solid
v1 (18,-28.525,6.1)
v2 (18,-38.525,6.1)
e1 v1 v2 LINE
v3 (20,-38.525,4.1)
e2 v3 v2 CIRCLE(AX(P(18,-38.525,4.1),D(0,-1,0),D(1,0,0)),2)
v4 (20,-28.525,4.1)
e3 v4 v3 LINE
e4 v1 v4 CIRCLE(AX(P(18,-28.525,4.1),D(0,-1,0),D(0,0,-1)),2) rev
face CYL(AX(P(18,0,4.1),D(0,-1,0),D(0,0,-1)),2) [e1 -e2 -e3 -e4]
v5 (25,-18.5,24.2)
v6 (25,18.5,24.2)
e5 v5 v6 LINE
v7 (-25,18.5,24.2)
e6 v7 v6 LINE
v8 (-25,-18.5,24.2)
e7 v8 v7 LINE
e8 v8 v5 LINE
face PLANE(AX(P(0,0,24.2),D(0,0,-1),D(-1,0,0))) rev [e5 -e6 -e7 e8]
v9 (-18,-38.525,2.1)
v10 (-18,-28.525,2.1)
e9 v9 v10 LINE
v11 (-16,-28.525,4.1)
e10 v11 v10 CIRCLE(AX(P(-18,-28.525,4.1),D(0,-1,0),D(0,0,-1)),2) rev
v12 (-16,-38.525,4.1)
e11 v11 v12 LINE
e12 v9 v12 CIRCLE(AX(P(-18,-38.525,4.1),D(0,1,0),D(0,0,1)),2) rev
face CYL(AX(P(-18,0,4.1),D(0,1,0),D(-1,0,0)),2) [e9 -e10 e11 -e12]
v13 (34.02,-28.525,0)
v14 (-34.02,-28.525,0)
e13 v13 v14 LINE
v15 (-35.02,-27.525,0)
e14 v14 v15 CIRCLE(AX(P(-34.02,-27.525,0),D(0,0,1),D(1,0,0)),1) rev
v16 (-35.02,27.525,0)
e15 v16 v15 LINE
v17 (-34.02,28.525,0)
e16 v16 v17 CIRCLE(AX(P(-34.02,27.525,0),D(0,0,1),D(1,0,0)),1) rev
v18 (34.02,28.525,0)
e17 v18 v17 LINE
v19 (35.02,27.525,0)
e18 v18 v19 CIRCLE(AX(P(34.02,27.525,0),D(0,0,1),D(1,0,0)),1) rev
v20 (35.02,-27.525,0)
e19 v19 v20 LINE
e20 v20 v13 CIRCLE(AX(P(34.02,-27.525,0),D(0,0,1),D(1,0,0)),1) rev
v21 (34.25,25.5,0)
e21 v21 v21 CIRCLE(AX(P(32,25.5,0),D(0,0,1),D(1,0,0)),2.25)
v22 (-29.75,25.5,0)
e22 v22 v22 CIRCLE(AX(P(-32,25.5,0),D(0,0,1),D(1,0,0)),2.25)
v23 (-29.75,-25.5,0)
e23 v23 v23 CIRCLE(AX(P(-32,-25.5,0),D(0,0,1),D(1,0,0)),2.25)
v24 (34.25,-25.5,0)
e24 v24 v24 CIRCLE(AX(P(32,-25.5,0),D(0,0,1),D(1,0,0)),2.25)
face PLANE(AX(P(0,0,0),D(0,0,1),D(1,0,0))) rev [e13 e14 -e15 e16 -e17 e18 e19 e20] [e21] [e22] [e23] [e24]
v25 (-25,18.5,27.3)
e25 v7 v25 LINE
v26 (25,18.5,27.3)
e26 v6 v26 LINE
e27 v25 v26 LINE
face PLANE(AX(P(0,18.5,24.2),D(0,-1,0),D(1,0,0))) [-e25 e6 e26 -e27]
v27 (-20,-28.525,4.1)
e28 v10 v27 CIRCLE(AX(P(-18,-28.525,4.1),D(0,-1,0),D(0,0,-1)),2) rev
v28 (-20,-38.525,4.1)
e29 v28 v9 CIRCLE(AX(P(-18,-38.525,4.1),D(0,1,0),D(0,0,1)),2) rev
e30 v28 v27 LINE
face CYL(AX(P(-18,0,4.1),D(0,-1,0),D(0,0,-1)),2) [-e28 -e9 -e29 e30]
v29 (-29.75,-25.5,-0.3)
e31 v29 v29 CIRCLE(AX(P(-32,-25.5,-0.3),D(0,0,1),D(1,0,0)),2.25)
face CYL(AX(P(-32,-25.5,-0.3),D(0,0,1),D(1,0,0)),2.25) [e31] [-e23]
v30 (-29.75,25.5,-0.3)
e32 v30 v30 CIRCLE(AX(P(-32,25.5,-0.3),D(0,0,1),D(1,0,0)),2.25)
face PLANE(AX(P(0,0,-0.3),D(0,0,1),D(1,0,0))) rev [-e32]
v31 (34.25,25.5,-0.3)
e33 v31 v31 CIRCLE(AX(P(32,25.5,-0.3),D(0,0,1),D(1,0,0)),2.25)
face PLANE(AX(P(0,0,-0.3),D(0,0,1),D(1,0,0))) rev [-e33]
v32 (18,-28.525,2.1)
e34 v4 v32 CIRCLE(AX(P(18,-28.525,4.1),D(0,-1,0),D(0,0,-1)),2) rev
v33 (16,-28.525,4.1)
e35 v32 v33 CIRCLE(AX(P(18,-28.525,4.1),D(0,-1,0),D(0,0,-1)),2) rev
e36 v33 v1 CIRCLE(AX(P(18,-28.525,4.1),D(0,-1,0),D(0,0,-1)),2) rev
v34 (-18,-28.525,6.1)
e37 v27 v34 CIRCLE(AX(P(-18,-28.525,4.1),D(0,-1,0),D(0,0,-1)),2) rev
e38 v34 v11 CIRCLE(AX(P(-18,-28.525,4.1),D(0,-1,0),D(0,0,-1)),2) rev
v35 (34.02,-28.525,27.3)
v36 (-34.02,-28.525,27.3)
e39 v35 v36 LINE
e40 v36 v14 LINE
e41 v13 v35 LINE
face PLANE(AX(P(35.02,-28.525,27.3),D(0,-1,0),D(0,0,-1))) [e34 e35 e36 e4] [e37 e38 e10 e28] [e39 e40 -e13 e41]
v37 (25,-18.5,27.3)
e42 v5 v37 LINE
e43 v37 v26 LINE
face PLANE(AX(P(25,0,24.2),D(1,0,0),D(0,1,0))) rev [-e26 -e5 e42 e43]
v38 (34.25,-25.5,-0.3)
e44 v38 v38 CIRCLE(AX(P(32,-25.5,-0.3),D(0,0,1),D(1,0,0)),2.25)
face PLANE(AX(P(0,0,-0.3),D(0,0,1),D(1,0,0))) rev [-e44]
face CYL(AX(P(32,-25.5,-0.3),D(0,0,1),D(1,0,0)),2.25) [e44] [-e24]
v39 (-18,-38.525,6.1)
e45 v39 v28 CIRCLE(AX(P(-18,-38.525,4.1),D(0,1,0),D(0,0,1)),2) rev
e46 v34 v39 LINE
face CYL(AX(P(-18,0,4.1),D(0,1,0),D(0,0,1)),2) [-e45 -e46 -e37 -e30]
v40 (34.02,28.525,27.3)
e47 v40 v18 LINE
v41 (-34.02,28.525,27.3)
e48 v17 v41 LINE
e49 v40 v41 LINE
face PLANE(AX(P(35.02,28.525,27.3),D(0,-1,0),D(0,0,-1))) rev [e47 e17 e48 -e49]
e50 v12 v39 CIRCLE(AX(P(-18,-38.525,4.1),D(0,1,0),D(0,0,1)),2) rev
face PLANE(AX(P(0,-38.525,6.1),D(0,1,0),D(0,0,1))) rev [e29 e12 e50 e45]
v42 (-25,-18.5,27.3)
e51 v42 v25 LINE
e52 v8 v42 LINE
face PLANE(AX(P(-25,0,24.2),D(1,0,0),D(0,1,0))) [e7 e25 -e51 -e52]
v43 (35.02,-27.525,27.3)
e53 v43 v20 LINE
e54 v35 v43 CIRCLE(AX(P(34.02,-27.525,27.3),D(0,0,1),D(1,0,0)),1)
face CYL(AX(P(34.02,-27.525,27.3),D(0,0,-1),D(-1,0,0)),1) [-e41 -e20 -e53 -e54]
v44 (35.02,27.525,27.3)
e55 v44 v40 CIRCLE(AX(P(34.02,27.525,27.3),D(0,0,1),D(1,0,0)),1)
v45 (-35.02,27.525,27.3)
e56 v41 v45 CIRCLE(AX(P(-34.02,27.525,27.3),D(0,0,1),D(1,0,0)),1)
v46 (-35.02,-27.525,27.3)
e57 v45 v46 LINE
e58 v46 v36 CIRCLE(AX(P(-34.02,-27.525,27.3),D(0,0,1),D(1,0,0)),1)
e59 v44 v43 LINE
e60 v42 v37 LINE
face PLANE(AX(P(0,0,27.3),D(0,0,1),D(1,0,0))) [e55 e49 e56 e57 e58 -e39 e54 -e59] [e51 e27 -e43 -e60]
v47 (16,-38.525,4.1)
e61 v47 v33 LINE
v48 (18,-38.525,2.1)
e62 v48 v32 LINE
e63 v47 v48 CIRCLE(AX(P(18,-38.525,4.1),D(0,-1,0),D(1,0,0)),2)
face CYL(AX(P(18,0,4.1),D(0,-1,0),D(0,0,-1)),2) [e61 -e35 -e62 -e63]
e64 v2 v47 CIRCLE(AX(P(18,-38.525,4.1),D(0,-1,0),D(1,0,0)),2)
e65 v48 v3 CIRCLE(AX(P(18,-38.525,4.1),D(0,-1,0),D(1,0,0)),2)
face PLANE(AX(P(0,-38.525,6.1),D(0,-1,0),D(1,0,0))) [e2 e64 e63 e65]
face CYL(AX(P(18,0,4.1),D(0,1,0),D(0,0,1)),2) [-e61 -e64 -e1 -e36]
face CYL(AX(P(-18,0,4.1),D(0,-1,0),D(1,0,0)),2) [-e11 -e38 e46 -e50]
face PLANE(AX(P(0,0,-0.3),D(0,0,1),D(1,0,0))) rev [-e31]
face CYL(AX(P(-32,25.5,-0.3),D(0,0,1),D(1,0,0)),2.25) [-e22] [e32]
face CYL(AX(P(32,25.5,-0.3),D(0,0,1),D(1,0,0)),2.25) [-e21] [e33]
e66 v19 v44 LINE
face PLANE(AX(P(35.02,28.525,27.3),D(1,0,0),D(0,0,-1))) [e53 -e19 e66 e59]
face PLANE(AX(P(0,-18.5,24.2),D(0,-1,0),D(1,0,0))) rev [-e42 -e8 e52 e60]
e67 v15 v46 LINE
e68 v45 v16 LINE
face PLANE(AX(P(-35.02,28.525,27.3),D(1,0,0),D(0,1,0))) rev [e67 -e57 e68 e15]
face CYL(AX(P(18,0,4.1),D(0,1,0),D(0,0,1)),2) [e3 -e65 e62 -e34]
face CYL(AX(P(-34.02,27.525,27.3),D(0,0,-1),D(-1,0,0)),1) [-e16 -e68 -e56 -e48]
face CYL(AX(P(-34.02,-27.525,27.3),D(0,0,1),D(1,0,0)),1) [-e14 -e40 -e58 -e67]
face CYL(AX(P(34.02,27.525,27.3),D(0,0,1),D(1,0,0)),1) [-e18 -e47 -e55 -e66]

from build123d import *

# Parameters (mm, degrees)
MAIN_FEATURES_SKETCH_W   = 70.04
MAIN_FEATURES_SKETCH_H   = 57.05
MAIN_BODY_DEPTH          = 27.3
WIRES_START              = 2.1
MAIN_FEATURES_SKETCH_3_W = 4
MAIN_FEATURES_SKETCH_3_H = 10
WIRES_2_DEPTH            = 4
LENS_CUTOUT_START        = 27.3
MAIN_FEATURES_SKETCH_4_W = 50
MAIN_FEATURES_SKETCH_4_H = 37
LENS_CUTOUT_DEPTH        = 3.1
MAIN_FEATURES_SKETCH_5_R = 2.25
SCREW_HEADS_DEPTH        = 0.3
FILLET1_R                = 1
FILLET2_R                = 2


with BuildPart() as part:
    # main_features_sketch → main_body (new body)
    with BuildSketch(Plane.XY):
        Rectangle(MAIN_FEATURES_SKETCH_W, MAIN_FEATURES_SKETCH_H)
    extrude(amount=MAIN_BODY_DEPTH)

    # main_features_sketch<3> → wires 2 (add)
    with BuildSketch(Plane.XY.offset(WIRES_START)):
        with Locations((-18, -33.525)):
            Rectangle(MAIN_FEATURES_SKETCH_3_W, MAIN_FEATURES_SKETCH_3_H)
        with Locations((18, -33.525)):
            Rectangle(MAIN_FEATURES_SKETCH_3_W, MAIN_FEATURES_SKETCH_3_H)
    extrude(amount=WIRES_2_DEPTH)

    # main_features_sketch<4> → lens_cutout (cut)
    with BuildSketch(Plane.XY.offset(LENS_CUTOUT_START)):
        Rectangle(MAIN_FEATURES_SKETCH_4_W, MAIN_FEATURES_SKETCH_4_H)
    extrude(amount=-LENS_CUTOUT_DEPTH, mode=Mode.SUBTRACT)

    # main_features_sketch<5> → screw_heads (add)
    with BuildSketch(Plane.XY):
        with Locations((-32, -25.5)):
            Circle(MAIN_FEATURES_SKETCH_5_R)
        with Locations((32, -25.5)):
            Circle(MAIN_FEATURES_SKETCH_5_R)
        with Locations((32, 25.5)):
            Circle(MAIN_FEATURES_SKETCH_5_R)
        with Locations((-32, 25.5)):
            Circle(MAIN_FEATURES_SKETCH_5_R)
    extrude(amount=-SCREW_HEADS_DEPTH)

    # Fillet1
    fillet1_edges = [part.edges().sort_by_distance(p)[0] for p in [
        (35.02, 28.525, 13.65),
        (35.02, -28.525, 13.65),
        (-35.02, -28.525, 13.65),
        (-35.02, 28.525, 13.65),
    ]]
    fillet(fillet1_edges, radius=FILLET1_R)

    # Fillet2
    fillet2_edges = [part.edges().sort_by_distance(p)[0] for p in [
        (20, -33.525, 2.1),
        (20, -33.525, 6.1),
        (16, -33.525, 2.1),
        (16, -33.525, 6.1),
        (-16, -33.525, 2.1),
        (-16, -33.525, 6.1),
        (-20, -33.525, 2.1),
        (-20, -33.525, 6.1),
    ]]
    fillet(fillet2_edges, radius=FILLET2_R - 0.0001)  # a hair under: the kernel refuses the full size


solid = part.part
